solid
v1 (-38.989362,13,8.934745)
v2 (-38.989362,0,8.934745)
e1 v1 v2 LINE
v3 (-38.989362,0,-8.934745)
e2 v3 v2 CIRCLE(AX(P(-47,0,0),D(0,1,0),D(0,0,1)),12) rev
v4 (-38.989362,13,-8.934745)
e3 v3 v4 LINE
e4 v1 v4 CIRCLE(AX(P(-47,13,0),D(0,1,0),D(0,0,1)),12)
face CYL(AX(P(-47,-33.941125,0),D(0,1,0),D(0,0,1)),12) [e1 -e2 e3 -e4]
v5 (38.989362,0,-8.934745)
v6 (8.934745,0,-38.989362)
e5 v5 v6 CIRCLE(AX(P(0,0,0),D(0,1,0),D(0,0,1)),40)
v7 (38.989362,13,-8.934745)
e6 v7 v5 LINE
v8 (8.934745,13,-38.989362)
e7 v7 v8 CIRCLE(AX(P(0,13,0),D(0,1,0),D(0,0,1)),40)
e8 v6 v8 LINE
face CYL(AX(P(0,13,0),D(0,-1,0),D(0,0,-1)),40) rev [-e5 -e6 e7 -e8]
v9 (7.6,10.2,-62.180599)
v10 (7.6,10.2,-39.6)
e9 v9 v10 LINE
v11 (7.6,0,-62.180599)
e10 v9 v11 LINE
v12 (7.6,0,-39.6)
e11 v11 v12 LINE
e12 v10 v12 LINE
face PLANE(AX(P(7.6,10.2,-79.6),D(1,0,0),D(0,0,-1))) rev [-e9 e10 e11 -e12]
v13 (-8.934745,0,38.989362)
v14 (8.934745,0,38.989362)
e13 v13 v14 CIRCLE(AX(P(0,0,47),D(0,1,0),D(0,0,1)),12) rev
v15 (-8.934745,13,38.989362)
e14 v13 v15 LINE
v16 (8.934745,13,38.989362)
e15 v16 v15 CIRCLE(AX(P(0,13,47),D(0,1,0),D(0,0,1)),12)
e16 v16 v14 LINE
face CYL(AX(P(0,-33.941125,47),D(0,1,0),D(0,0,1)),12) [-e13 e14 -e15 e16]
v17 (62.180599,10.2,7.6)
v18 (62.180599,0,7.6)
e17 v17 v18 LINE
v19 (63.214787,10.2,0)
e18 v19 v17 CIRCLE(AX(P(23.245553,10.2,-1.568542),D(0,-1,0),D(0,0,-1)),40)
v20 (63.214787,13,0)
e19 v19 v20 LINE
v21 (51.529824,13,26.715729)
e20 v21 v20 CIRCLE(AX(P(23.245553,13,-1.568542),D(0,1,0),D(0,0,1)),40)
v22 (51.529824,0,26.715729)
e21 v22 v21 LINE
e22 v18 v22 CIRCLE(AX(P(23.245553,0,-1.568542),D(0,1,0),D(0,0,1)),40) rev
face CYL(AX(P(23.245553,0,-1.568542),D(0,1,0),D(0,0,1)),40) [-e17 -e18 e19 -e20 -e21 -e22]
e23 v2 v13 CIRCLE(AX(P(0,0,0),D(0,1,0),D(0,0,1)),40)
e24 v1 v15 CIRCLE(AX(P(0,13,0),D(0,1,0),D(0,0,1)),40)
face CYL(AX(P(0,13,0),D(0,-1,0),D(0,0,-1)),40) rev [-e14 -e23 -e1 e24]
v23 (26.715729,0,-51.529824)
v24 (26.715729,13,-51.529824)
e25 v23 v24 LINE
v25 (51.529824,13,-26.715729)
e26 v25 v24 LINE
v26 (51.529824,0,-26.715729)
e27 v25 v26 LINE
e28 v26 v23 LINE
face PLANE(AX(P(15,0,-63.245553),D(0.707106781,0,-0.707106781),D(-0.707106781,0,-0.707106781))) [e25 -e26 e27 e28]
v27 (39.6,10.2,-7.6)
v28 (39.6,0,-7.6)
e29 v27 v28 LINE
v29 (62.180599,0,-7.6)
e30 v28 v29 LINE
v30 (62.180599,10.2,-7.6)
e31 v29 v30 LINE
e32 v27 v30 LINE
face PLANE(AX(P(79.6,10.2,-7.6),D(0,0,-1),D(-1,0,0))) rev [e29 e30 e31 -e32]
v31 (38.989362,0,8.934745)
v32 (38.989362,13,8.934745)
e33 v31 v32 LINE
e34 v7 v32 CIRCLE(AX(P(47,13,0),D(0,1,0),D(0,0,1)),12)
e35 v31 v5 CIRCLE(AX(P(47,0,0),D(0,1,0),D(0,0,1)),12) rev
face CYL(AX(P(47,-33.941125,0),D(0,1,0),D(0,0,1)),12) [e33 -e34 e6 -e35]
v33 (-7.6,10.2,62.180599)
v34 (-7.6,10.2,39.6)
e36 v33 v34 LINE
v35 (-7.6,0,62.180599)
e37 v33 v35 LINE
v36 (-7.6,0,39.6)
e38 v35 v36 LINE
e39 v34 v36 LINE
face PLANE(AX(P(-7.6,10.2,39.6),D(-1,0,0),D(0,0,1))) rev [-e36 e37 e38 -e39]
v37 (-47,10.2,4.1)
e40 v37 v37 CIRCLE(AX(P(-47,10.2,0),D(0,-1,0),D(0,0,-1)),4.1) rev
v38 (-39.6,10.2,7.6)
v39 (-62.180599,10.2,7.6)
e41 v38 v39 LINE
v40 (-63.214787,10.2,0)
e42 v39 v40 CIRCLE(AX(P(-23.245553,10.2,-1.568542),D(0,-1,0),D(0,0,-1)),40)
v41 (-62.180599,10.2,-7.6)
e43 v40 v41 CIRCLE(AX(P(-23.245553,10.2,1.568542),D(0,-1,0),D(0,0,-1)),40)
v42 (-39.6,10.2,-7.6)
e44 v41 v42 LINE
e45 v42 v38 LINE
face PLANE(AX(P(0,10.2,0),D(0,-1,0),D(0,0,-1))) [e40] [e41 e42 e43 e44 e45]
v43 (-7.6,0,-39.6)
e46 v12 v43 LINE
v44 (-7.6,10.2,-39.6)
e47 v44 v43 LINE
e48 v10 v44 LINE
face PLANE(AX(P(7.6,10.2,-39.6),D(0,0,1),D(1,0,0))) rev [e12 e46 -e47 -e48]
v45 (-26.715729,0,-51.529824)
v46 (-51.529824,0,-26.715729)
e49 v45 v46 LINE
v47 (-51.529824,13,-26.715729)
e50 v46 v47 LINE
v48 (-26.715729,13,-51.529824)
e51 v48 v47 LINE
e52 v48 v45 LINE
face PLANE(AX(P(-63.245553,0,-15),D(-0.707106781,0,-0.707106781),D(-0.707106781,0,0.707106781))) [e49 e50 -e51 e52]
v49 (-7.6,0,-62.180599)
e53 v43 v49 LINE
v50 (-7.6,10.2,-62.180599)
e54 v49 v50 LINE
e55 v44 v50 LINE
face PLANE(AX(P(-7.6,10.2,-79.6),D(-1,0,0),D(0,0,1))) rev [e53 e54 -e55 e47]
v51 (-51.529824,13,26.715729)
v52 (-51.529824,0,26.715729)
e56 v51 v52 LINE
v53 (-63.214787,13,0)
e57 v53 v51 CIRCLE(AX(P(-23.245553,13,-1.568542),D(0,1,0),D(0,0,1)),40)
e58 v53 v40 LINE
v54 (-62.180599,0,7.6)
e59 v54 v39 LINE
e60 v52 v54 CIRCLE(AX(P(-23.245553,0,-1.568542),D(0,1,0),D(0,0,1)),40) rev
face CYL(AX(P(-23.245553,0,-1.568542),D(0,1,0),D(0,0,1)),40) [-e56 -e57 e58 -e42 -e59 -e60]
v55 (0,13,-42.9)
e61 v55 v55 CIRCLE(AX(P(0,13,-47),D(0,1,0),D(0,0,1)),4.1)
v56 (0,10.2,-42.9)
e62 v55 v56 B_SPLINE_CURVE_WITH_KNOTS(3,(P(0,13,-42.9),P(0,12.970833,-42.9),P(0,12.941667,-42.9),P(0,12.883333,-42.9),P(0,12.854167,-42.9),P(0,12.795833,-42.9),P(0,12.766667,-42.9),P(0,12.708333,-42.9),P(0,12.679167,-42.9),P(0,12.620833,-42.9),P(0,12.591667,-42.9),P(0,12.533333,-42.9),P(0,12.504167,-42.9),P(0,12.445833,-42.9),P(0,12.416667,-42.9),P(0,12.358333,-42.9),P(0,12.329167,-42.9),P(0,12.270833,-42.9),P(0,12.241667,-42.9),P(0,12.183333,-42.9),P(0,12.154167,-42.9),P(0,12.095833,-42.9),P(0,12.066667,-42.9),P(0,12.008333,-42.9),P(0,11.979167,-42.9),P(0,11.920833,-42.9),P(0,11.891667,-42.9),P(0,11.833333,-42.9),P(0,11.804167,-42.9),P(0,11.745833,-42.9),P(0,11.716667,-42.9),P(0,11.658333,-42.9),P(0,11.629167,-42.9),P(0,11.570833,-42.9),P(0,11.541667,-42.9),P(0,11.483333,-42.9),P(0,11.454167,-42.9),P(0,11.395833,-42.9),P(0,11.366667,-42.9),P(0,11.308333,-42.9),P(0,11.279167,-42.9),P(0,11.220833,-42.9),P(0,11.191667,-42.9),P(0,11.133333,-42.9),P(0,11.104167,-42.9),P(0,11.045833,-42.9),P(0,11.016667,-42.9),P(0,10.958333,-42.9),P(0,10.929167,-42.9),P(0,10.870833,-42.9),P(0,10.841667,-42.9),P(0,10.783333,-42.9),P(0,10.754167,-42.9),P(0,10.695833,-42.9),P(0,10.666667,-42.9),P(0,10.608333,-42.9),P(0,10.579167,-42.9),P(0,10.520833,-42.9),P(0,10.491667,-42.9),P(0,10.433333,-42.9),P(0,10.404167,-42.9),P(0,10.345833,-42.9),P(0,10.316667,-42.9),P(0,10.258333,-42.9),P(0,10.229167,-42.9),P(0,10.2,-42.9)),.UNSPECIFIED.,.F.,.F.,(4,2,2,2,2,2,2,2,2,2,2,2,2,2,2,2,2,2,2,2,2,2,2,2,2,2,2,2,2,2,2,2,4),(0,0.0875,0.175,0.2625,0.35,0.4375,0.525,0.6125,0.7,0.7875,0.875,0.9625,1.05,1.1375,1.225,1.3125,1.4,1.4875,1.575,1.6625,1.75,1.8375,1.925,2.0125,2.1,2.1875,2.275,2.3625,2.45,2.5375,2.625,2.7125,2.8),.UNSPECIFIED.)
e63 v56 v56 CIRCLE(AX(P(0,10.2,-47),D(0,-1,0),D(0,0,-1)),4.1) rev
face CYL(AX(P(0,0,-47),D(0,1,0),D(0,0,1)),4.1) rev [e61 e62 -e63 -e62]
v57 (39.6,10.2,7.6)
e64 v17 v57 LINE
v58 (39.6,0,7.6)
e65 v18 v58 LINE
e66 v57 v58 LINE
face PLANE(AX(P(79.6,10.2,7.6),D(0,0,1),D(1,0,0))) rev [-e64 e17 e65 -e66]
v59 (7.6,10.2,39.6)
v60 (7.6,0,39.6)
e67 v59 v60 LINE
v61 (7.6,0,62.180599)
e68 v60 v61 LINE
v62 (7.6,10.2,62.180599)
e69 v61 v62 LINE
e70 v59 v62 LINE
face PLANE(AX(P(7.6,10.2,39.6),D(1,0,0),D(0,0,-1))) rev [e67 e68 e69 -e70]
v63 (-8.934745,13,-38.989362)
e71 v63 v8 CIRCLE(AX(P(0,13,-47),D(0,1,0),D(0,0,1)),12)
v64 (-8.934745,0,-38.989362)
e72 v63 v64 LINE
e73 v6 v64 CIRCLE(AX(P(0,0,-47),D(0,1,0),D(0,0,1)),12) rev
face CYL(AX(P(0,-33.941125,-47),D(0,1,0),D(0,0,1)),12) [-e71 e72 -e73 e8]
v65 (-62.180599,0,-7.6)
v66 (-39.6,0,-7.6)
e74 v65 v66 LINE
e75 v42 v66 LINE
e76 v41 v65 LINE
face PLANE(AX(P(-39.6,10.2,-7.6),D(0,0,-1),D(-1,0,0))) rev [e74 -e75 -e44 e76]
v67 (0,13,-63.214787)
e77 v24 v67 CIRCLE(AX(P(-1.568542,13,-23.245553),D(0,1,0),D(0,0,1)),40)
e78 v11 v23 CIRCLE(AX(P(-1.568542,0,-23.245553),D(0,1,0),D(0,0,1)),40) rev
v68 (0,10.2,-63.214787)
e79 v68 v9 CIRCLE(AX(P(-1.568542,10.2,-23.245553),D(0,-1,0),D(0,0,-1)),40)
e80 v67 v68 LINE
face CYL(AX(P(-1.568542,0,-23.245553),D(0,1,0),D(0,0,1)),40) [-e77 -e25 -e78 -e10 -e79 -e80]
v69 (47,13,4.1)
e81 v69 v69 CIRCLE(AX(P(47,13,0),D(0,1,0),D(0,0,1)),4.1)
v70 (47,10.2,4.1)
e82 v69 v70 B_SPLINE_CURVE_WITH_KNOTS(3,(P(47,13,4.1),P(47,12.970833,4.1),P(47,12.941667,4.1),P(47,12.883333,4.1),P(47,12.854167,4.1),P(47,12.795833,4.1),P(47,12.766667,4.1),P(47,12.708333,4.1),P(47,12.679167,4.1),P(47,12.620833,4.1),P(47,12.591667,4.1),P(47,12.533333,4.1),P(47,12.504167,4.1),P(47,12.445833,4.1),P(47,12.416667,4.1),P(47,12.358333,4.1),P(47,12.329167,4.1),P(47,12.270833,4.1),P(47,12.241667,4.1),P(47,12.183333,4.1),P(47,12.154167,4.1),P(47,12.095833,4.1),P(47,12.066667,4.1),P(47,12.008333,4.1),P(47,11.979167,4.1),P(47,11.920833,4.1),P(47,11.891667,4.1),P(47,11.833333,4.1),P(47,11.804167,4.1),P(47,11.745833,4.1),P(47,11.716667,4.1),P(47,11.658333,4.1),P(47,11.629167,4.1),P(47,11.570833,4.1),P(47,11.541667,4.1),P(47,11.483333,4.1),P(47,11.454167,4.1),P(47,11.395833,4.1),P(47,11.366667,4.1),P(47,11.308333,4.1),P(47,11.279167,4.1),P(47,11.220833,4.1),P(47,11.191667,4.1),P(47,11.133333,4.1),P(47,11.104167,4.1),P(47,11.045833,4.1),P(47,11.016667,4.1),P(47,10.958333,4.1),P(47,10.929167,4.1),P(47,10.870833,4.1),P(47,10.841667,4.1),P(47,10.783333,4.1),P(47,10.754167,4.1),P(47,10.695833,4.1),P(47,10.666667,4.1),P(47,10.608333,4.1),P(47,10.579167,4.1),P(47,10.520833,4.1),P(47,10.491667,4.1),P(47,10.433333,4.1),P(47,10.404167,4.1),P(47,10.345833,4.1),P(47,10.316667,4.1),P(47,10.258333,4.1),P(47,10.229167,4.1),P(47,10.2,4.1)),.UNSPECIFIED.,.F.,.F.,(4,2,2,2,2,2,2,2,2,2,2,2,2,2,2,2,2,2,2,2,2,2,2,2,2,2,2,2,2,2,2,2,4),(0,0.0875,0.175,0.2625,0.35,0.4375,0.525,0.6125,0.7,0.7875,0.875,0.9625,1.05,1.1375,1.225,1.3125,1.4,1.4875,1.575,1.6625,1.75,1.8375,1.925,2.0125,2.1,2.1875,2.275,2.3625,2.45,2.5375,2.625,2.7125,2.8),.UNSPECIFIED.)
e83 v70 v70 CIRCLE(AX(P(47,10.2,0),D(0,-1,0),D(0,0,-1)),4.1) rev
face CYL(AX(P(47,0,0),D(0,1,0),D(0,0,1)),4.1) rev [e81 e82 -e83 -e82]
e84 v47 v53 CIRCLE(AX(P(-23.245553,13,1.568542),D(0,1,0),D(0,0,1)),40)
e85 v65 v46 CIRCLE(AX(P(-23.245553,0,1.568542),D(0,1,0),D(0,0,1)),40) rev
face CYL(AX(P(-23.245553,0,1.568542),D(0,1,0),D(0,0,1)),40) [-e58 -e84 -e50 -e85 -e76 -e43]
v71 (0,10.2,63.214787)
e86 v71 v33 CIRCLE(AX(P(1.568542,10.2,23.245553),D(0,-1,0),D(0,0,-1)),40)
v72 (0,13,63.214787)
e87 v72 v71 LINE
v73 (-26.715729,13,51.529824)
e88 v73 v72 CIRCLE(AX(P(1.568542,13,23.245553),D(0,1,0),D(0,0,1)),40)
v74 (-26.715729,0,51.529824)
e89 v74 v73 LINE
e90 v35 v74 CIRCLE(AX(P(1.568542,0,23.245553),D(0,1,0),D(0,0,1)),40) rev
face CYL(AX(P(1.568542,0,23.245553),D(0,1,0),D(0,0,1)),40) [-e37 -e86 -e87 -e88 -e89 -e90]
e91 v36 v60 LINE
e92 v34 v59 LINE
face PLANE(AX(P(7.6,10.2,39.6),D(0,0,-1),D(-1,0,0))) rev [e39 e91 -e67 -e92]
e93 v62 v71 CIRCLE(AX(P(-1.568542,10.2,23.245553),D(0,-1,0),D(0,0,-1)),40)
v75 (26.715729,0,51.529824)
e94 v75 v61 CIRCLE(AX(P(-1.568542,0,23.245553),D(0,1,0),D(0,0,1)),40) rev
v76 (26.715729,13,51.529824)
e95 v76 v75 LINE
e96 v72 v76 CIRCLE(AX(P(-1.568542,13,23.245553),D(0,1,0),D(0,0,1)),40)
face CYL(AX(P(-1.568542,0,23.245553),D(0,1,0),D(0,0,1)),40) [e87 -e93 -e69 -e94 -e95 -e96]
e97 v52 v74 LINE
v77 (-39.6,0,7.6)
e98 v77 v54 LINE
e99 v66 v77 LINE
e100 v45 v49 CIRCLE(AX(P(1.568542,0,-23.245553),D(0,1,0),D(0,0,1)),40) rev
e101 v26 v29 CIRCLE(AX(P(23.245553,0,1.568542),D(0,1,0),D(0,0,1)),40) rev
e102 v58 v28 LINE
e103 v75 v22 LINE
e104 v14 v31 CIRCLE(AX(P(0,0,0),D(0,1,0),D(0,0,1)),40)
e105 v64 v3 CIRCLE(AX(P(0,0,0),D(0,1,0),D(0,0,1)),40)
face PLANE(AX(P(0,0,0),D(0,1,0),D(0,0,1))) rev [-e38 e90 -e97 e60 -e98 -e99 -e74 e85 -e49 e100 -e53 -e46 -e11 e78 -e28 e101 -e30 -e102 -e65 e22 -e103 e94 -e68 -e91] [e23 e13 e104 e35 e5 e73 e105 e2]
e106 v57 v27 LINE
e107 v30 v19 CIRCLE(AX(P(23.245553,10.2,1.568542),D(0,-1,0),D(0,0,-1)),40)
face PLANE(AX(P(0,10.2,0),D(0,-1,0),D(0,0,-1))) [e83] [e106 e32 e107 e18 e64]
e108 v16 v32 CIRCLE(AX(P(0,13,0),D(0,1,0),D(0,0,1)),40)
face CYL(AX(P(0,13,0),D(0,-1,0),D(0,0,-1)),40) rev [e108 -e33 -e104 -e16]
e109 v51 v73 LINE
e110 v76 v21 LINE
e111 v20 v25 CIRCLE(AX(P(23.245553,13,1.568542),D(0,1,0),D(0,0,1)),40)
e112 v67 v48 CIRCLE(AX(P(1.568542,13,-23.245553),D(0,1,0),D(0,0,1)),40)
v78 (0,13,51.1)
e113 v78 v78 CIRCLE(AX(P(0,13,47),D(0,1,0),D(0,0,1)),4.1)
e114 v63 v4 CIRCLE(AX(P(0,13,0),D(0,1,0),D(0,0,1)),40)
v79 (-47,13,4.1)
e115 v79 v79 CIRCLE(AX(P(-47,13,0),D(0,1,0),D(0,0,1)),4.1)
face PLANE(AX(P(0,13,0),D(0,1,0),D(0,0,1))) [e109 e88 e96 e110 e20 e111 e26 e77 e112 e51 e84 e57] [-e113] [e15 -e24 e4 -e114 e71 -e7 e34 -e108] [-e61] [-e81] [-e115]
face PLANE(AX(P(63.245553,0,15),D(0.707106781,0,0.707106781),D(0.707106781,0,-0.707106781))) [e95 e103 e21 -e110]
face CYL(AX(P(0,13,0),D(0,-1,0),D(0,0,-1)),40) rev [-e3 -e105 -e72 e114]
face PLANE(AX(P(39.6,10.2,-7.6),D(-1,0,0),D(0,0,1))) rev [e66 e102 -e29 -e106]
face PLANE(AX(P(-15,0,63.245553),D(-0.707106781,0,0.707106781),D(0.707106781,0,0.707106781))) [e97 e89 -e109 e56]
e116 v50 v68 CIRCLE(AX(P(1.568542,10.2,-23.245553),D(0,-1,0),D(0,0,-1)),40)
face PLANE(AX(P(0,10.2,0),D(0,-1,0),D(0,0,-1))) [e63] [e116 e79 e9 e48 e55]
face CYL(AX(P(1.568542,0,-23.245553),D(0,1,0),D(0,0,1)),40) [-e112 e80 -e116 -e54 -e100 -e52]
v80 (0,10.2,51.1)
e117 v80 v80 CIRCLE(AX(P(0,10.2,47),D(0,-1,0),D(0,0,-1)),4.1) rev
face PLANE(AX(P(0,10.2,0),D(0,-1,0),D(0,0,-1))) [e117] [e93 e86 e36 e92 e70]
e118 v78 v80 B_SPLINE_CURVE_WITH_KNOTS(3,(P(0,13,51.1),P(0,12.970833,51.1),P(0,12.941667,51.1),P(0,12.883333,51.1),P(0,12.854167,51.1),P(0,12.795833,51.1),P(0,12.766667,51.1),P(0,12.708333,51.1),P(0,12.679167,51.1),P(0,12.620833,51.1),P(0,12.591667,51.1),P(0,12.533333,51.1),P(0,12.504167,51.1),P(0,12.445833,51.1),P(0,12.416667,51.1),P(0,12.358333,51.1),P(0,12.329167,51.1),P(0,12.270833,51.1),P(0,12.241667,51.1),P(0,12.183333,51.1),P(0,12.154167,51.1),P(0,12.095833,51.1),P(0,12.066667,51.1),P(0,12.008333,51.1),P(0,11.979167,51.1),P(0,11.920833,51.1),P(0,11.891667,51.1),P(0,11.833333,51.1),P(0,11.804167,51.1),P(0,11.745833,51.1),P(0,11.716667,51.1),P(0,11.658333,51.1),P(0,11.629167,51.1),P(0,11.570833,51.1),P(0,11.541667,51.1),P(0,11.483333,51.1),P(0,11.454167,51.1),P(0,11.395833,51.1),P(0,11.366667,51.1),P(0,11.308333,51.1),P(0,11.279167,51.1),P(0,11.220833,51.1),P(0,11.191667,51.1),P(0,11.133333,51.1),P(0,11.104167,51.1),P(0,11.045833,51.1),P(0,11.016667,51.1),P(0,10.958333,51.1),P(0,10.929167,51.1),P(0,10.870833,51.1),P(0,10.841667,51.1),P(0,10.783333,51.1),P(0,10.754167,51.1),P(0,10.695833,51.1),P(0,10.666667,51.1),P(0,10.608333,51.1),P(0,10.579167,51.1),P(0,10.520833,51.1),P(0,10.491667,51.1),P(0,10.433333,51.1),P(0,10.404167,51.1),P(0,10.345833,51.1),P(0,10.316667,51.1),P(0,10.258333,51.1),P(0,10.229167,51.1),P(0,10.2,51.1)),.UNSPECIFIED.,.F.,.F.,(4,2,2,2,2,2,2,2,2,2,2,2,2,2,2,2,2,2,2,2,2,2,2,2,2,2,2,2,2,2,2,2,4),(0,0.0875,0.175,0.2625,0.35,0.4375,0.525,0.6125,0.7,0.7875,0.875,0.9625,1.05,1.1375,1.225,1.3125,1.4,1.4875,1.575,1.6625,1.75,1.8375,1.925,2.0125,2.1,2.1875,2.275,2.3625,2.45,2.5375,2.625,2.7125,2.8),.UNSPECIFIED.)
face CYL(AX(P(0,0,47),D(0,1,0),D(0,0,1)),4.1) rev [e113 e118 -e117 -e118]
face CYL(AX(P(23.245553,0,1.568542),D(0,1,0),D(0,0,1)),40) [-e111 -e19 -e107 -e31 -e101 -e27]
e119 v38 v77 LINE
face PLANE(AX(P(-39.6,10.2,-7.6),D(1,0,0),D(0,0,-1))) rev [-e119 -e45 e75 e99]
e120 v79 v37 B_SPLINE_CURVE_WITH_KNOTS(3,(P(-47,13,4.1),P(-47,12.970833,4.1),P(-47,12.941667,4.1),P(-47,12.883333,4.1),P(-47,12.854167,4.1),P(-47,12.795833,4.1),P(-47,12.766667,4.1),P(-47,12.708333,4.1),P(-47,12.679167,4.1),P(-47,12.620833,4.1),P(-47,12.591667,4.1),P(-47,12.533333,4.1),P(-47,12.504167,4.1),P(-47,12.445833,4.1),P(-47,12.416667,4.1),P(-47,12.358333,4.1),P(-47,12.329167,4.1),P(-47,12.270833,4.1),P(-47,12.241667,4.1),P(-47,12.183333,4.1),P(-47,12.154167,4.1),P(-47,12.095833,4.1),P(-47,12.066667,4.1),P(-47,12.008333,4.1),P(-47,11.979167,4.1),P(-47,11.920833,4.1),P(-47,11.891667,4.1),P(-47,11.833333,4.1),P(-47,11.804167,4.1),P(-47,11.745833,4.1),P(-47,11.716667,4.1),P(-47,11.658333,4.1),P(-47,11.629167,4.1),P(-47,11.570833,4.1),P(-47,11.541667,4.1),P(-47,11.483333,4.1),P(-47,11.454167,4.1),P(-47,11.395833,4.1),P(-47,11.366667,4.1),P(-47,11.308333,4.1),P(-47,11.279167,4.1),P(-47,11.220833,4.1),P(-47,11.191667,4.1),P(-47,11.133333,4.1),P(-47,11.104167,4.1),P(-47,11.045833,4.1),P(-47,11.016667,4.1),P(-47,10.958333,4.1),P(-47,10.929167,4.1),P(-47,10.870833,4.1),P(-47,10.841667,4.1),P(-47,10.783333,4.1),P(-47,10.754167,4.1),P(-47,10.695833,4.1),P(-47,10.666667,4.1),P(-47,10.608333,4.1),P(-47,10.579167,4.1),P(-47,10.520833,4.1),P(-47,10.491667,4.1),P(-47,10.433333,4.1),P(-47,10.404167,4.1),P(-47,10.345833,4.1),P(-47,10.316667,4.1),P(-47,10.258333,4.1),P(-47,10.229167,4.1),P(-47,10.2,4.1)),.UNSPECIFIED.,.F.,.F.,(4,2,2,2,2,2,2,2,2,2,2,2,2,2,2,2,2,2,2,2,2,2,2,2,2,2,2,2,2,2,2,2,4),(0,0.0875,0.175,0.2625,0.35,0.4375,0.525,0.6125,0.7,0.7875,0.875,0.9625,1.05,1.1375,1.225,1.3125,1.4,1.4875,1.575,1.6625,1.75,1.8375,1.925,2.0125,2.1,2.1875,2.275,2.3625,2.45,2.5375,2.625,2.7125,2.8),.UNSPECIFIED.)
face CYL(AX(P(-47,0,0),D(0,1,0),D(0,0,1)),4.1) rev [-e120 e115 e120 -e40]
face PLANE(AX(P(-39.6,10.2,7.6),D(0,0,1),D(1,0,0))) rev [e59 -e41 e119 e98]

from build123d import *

# Parameters (mm, degrees)
SKETCH1_R           = 65
SKETCH1_R_2         = 40
BOSS_EXTRUDE1_DEPTH = 13
SKETCH2_R           = 4.1
CUT_EXTRUDE1_DEPTH  = 93.838569571
SKETCH8_R           = 12
SKETCH8_R_2         = 4.1
BOSS_EXTRUDE4_DEPTH = 13
SKETCH3_W           = 15.2
SKETCH3_H           = 40
SKETCH3_W_2         = 40
SKETCH3_H_2         = 15.2
CUT_EXTRUDE2_DEPTH  = 10.2
BOSS_EXTRUDE2_DEPTH = 13
FILLET1_R           = 30
BOSS_EXTRUDE3_START = -13
BOSS_EXTRUDE3_DEPTH = 13
CUT_EXTRUDE3_DEPTH  = 93.838569571
FILLET2_R           = 30
SKETCH7_OUTSIDE_W   = 168.862
SKETCH7_OUTSIDE_H   = 168.862
CUT_EXTRUDE4_DEPTH  = 93.838569571
FILLET3_R           = 40


with BuildPart() as part:
    # Sketch1 → Boss-Extrude1 (new body)
    with BuildSketch(Plane(origin=(0, 0, 0), x_dir=(1, 0, 0), z_dir=(0, 1, 0))):
        with Locations(Location((0, 0, 0), (0, 0, 90))):
            Circle(SKETCH1_R)
        with Locations(Location((0, 0, 0), (0, 0, 90))):
            Circle(SKETCH1_R_2, mode=Mode.SUBTRACT)
    extrude(amount=BOSS_EXTRUDE1_DEPTH)

    # Sketch2 → Cut-Extrude1 (cut, through all)
    with BuildSketch(Plane(origin=(0, 13, 0), x_dir=(1, 0, 0), z_dir=(0, 1, 0))):
        with Locations(Location((0, 47, 0), (0, 0, 270))):
            Circle(SKETCH2_R)
        with Locations(Location((47, 0, 0), (0, 0, 270))):
            Circle(SKETCH2_R)
        with Locations(Location((0, -47, 0), (0, 0, 270))):
            Circle(SKETCH2_R)
        with Locations(Location((-47, 0, 0), (0, 0, 270))):
            Circle(SKETCH2_R)
    extrude(amount=-CUT_EXTRUDE1_DEPTH, mode=Mode.SUBTRACT)

    # Sketch8 → Boss-Extrude4 (add)
    # profile 1 of 4: a face of its own
    with BuildSketch(Plane(origin=(0, 13, 0), x_dir=(1, 0, 0), z_dir=(0, 1, 0))):
        with Locations((47, 0)):
            Circle(SKETCH8_R)
        with Locations(Location((47, 0, 0), (0, 0, 270))):
            Circle(SKETCH8_R_2, mode=Mode.SUBTRACT)
    # profile 2 of 4: a face of its own
    with BuildSketch(Plane(origin=(0, 13, 0), x_dir=(1, 0, 0), z_dir=(0, 1, 0))):
        with Locations((0, -47)):
            Circle(SKETCH8_R)
        with Locations(Location((0, -47, 0), (0, 0, 270))):
            Circle(SKETCH8_R_2, mode=Mode.SUBTRACT)
    # profile 3 of 4: a face of its own
    with BuildSketch(Plane(origin=(0, 13, 0), x_dir=(1, 0, 0), z_dir=(0, 1, 0))):
        with Locations((-47, 0)):
            Circle(SKETCH8_R)
        with Locations(Location((-47, 0, 0), (0, 0, 270))):
            Circle(SKETCH8_R_2, mode=Mode.SUBTRACT)
    # profile 4 of 4: a face of its own
    with BuildSketch(Plane(origin=(0, 13, 0), x_dir=(1, 0, 0), z_dir=(0, 1, 0))):
        with Locations((0, 47)):
            Circle(SKETCH8_R)
        with Locations(Location((0, 47, 0), (0, 0, 270))):
            Circle(SKETCH8_R_2, mode=Mode.SUBTRACT)
    extrude(amount=-BOSS_EXTRUDE4_DEPTH)

    # Sketch3 → Cut-Extrude2 (cut)
    with BuildSketch(Plane.XZ):
        with Locations((0, 59.6)):
            Rectangle(SKETCH3_W, SKETCH3_H)
        with Locations((59.6, 0)):
            Rectangle(SKETCH3_W_2, SKETCH3_H_2)
        with Locations((0, -59.6)):
            Rectangle(SKETCH3_W, SKETCH3_H)
        with Locations((-59.6, 0)):
            Rectangle(SKETCH3_W_2, SKETCH3_H_2)
    extrude(amount=-CUT_EXTRUDE2_DEPTH, mode=Mode.SUBTRACT)

    # Sketch4 → Boss-Extrude2 (add)
    with BuildSketch(Plane(origin=(0, 13, 0), x_dir=(1, 0, 0), z_dir=(0, 1, 0))):
        Polygon((-33.587572106, -58.336309448), (-58.336309448, -33.587572106), (-56.639196695, -31.890459353), (-31.890459353, -56.639196695), align=None)
    extrude(amount=-BOSS_EXTRUDE2_DEPTH)

    # Fillet1
    # the kernel refuses this fillet: 30 mm, written as the material it adds along each edge
    with BuildSketch(Plane(origin=(-56.639196695, 13, 31.890459353), x_dir=(-0.43072276652908487, 0, -0.9024842926021104), z_dir=(0, -1, 0))) as fillet1_piece_1:
        with BuildLine():
            CenterArc((10.793469922, -29.931661034), FILLET1_R, 93.868064257, 18.866970785)
            Line((-0.800632502, -2.262602703), (-1.032514551, -1.709221536))
            ThreePointArc((-1.032514551, -1.709221536), (-0.965948102, -0.931149887), (-0.565631851, 0.200151465))
            Line((-0.565631851, 0.200151465), (0.040475512, 0.598633221))
            ThreePointArc((0.040475512, 0.598633221), (4.384847156, 0.451932241), (8.729218799, 0.598633221))
            Line((8.729218799, 0.598633221), (8.769694312, 0))
        make_face()
    extrude(amount=13)
    with BuildSketch(Plane(origin=(-31.890459353, 13, 56.639196695), x_dir=(0.9024842926021067, 0, 0.4307227665290924), z_dir=(0, -1, 0))) as fillet1_piece_2:
        with BuildLine():
            CenterArc((10.793469922, 29.931661034), FILLET1_R, 247.264964958, 18.866970785)
            Line((-0.800632502, 2.262602703), (-1.032514551, 1.709221536))
            ThreePointArc((-1.032514551, 1.709221536), (-0.965948102, 0.931149887), (-0.565631851, -0.200151465))
            Line((-0.565631851, -0.200151465), (0.040475512, -0.598633221))
            ThreePointArc((0.040475512, -0.598633221), (4.384847156, -0.451932241), (8.729218799, -0.598633221))
            Line((8.729218799, -0.598633221), (8.769694312, 0))
        make_face()
    extrude(amount=13)

    # Sketch5 → Boss-Extrude3 (add)
    with BuildSketch(Plane(origin=(0, 13, 0), x_dir=(1, 0, 0), z_dir=(0, 1, 0)).offset(BOSS_EXTRUDE3_START)):
        with BuildLine():
            Line((-31.522820305, 59.213121857), (-29.981916204, 57.672217755))
            ThreePointArc((-29.981916204, 57.672217755), (-34.692861997, 54.825243953), (-39.146042554, 51.589899608))
            Line((-39.146042554, 51.589899608), (-31.522820305, 59.213121857))
        make_face()
        with BuildLine():
            Line((-59.213121857, 31.522820305), (-57.672217755, 29.981916204))
            ThreePointArc((-57.672217755, 29.981916204), (-55.348212032, 34.081892918), (-52.733240933, 38.002701228))
            Line((-52.733240933, 38.002701228), (-59.213121857, 31.522820305))
        make_face()
    extrude(amount=BOSS_EXTRUDE3_DEPTH)

    # Sketch6 → Cut-Extrude3 (cut, through all)
    with BuildSketch(Plane(origin=(0, 13, 0), x_dir=(1, 0, 0), z_dir=(0, 1, 0))):
        Polygon((-31.522820305, 59.213121857), (-59.213121857, 31.522820305), (-61.494356901, 33.80405535), (-33.80405535, 61.494356901), align=None)
    extrude(amount=-CUT_EXTRUDE3_DEPTH, mode=Mode.SUBTRACT)

    # Fillet2
    # the kernel refuses this fillet: 30 mm, written as the material it adds along each edge
    with BuildSketch(Plane(origin=(-57.672217755, 0, -29.981916204), x_dir=(-0.4036365927453583, 0, 0.9149193959015831), z_dir=(0, 1, 0))) as fillet2_piece_1:
        with BuildLine():
            CenterArc((10.221339545, -29.938721136), FILLET2_R, 93.662741819, 17.866287174)
            Line((-0.787837769, -2.031768331), (-1.008021315, -1.473629275))
            ThreePointArc((-1.008021315, -1.473629275), (-0.953334813, -0.798965243), (-0.559415929, 0.216918922))
            Line((-0.559415929, 0.216918922), (0.038330023, 0.598774423))
            ThreePointArc((0.038330023, 0.598774423), (4.15241919, 0.467229129), (8.266508357, 0.598774423))
            Line((8.266508357, 0.598774423), (8.304838381, 0))
        make_face()
    extrude(amount=13)
    with BuildSketch(Plane(origin=(-29.981916204, 0, -57.672217755), x_dir=(-0.7071067811865491, 0, -0.7071067811865459), z_dir=(0, 1, 0))) as fillet2_piece_2:
        with BuildLine():
            CenterArc((24.218325876, -20.353758796), FILLET2_R, 137.276688213, 17.866287174)
            Line((-3.002460986, -7.743098124), (-3.546876723, -7.49088491))
            ThreePointArc((-3.546876723, -7.49088491), (-1.936856188, -3.702630997), (-0.572130762, 0.180738462))
            Line((-0.572130762, 0.180738462), (0, 0.6))
            ThreePointArc((0, 0.6), (1.089583739, 0.6), (1.738384311, 0.407075176))
            Line((1.738384311, 0.407075176), (2.179167479, 0))
        make_face()
    extrude(amount=13)

    # Sketch7 outside → Cut-Extrude4 (cut, through all)
    with BuildSketch(Plane(origin=(0, 13, 0), x_dir=(1, 0, 0), z_dir=(0, 1, 0))):
        Rectangle(SKETCH7_OUTSIDE_W, SKETCH7_OUTSIDE_H)
        Polygon((63.245553203, -15), (15, -63.245553203), (-15, -63.245553203), (-63.245553203, -15), (-63.245553203, 15), (-15, 63.245553203), (15, 63.245553203), (63.245553203, 15), align=None, mode=Mode.SUBTRACT)
    extrude(amount=-CUT_EXTRUDE4_DEPTH, mode=Mode.SUBTRACT)

    # Fillet3
    # the kernel refuses this fillet: 40 mm, written as the material it takes off along each edge
    with BuildSketch(Plane(origin=(15, 54.421356237, 63.245553203), x_dir=(-1, 0, 0), z_dir=(0, -1, 0)), Plane(origin=(-15, 54.421356237, 63.245553203), x_dir=(-0.7071067811865475, 0, -0.7071067811865477), z_dir=(0, -1, 0)), Plane(origin=(-63.245553203, 54.421356237, 15), x_dir=(0, 0, -1), z_dir=(0, -1, 0)), Plane(origin=(-63.245553203, 54.421356237, -15), x_dir=(0.7071067811865477, 0, -0.7071067811865475), z_dir=(0, -1, 0)), Plane(origin=(63.245553203, 54.421356237, 15), x_dir=(-0.7071067811865477, 0, 0.7071067811865475), z_dir=(0, -1, 0)), Plane(origin=(63.245553203, 54.421356237, -15), x_dir=(0, 0, 1), z_dir=(0, -1, 0))) as fillet3_piece_1:
        with BuildLine():
            CenterArc((FILLET3_R * 0.414213562373, FILLET3_R), FILLET3_R, 225, 45)
            Line((-FILLET3_R * 0.292893218813, FILLET3_R * 0.292893218813), (0, 0))
            Line((0, 0), (FILLET3_R * 0.414213562373, 0))
        make_face()
    extrude(amount=95.842712475, mode=Mode.SUBTRACT)
    with BuildSketch(Plane(origin=(-15, 54.421356237, -63.245553203), x_dir=(-0.7071067811865476, 0, 0.7071067811865476), z_dir=(0, -1, 0)), Plane(origin=(15, 54.421356237, -63.245553203), x_dir=(-1, 0, 0), z_dir=(0, -1, 0))) as fillet3_piece_2:
        with BuildLine():
            CenterArc((FILLET3_R * 0.414213562373, -FILLET3_R), FILLET3_R, 90, 45)
            Line((-FILLET3_R * 0.292893218813, -FILLET3_R * 0.292893218813), (0, 0))
            Line((0, 0), (FILLET3_R * 0.414213562373, 0))
        make_face()
    extrude(amount=95.842712475, mode=Mode.SUBTRACT)


solid = part.part
